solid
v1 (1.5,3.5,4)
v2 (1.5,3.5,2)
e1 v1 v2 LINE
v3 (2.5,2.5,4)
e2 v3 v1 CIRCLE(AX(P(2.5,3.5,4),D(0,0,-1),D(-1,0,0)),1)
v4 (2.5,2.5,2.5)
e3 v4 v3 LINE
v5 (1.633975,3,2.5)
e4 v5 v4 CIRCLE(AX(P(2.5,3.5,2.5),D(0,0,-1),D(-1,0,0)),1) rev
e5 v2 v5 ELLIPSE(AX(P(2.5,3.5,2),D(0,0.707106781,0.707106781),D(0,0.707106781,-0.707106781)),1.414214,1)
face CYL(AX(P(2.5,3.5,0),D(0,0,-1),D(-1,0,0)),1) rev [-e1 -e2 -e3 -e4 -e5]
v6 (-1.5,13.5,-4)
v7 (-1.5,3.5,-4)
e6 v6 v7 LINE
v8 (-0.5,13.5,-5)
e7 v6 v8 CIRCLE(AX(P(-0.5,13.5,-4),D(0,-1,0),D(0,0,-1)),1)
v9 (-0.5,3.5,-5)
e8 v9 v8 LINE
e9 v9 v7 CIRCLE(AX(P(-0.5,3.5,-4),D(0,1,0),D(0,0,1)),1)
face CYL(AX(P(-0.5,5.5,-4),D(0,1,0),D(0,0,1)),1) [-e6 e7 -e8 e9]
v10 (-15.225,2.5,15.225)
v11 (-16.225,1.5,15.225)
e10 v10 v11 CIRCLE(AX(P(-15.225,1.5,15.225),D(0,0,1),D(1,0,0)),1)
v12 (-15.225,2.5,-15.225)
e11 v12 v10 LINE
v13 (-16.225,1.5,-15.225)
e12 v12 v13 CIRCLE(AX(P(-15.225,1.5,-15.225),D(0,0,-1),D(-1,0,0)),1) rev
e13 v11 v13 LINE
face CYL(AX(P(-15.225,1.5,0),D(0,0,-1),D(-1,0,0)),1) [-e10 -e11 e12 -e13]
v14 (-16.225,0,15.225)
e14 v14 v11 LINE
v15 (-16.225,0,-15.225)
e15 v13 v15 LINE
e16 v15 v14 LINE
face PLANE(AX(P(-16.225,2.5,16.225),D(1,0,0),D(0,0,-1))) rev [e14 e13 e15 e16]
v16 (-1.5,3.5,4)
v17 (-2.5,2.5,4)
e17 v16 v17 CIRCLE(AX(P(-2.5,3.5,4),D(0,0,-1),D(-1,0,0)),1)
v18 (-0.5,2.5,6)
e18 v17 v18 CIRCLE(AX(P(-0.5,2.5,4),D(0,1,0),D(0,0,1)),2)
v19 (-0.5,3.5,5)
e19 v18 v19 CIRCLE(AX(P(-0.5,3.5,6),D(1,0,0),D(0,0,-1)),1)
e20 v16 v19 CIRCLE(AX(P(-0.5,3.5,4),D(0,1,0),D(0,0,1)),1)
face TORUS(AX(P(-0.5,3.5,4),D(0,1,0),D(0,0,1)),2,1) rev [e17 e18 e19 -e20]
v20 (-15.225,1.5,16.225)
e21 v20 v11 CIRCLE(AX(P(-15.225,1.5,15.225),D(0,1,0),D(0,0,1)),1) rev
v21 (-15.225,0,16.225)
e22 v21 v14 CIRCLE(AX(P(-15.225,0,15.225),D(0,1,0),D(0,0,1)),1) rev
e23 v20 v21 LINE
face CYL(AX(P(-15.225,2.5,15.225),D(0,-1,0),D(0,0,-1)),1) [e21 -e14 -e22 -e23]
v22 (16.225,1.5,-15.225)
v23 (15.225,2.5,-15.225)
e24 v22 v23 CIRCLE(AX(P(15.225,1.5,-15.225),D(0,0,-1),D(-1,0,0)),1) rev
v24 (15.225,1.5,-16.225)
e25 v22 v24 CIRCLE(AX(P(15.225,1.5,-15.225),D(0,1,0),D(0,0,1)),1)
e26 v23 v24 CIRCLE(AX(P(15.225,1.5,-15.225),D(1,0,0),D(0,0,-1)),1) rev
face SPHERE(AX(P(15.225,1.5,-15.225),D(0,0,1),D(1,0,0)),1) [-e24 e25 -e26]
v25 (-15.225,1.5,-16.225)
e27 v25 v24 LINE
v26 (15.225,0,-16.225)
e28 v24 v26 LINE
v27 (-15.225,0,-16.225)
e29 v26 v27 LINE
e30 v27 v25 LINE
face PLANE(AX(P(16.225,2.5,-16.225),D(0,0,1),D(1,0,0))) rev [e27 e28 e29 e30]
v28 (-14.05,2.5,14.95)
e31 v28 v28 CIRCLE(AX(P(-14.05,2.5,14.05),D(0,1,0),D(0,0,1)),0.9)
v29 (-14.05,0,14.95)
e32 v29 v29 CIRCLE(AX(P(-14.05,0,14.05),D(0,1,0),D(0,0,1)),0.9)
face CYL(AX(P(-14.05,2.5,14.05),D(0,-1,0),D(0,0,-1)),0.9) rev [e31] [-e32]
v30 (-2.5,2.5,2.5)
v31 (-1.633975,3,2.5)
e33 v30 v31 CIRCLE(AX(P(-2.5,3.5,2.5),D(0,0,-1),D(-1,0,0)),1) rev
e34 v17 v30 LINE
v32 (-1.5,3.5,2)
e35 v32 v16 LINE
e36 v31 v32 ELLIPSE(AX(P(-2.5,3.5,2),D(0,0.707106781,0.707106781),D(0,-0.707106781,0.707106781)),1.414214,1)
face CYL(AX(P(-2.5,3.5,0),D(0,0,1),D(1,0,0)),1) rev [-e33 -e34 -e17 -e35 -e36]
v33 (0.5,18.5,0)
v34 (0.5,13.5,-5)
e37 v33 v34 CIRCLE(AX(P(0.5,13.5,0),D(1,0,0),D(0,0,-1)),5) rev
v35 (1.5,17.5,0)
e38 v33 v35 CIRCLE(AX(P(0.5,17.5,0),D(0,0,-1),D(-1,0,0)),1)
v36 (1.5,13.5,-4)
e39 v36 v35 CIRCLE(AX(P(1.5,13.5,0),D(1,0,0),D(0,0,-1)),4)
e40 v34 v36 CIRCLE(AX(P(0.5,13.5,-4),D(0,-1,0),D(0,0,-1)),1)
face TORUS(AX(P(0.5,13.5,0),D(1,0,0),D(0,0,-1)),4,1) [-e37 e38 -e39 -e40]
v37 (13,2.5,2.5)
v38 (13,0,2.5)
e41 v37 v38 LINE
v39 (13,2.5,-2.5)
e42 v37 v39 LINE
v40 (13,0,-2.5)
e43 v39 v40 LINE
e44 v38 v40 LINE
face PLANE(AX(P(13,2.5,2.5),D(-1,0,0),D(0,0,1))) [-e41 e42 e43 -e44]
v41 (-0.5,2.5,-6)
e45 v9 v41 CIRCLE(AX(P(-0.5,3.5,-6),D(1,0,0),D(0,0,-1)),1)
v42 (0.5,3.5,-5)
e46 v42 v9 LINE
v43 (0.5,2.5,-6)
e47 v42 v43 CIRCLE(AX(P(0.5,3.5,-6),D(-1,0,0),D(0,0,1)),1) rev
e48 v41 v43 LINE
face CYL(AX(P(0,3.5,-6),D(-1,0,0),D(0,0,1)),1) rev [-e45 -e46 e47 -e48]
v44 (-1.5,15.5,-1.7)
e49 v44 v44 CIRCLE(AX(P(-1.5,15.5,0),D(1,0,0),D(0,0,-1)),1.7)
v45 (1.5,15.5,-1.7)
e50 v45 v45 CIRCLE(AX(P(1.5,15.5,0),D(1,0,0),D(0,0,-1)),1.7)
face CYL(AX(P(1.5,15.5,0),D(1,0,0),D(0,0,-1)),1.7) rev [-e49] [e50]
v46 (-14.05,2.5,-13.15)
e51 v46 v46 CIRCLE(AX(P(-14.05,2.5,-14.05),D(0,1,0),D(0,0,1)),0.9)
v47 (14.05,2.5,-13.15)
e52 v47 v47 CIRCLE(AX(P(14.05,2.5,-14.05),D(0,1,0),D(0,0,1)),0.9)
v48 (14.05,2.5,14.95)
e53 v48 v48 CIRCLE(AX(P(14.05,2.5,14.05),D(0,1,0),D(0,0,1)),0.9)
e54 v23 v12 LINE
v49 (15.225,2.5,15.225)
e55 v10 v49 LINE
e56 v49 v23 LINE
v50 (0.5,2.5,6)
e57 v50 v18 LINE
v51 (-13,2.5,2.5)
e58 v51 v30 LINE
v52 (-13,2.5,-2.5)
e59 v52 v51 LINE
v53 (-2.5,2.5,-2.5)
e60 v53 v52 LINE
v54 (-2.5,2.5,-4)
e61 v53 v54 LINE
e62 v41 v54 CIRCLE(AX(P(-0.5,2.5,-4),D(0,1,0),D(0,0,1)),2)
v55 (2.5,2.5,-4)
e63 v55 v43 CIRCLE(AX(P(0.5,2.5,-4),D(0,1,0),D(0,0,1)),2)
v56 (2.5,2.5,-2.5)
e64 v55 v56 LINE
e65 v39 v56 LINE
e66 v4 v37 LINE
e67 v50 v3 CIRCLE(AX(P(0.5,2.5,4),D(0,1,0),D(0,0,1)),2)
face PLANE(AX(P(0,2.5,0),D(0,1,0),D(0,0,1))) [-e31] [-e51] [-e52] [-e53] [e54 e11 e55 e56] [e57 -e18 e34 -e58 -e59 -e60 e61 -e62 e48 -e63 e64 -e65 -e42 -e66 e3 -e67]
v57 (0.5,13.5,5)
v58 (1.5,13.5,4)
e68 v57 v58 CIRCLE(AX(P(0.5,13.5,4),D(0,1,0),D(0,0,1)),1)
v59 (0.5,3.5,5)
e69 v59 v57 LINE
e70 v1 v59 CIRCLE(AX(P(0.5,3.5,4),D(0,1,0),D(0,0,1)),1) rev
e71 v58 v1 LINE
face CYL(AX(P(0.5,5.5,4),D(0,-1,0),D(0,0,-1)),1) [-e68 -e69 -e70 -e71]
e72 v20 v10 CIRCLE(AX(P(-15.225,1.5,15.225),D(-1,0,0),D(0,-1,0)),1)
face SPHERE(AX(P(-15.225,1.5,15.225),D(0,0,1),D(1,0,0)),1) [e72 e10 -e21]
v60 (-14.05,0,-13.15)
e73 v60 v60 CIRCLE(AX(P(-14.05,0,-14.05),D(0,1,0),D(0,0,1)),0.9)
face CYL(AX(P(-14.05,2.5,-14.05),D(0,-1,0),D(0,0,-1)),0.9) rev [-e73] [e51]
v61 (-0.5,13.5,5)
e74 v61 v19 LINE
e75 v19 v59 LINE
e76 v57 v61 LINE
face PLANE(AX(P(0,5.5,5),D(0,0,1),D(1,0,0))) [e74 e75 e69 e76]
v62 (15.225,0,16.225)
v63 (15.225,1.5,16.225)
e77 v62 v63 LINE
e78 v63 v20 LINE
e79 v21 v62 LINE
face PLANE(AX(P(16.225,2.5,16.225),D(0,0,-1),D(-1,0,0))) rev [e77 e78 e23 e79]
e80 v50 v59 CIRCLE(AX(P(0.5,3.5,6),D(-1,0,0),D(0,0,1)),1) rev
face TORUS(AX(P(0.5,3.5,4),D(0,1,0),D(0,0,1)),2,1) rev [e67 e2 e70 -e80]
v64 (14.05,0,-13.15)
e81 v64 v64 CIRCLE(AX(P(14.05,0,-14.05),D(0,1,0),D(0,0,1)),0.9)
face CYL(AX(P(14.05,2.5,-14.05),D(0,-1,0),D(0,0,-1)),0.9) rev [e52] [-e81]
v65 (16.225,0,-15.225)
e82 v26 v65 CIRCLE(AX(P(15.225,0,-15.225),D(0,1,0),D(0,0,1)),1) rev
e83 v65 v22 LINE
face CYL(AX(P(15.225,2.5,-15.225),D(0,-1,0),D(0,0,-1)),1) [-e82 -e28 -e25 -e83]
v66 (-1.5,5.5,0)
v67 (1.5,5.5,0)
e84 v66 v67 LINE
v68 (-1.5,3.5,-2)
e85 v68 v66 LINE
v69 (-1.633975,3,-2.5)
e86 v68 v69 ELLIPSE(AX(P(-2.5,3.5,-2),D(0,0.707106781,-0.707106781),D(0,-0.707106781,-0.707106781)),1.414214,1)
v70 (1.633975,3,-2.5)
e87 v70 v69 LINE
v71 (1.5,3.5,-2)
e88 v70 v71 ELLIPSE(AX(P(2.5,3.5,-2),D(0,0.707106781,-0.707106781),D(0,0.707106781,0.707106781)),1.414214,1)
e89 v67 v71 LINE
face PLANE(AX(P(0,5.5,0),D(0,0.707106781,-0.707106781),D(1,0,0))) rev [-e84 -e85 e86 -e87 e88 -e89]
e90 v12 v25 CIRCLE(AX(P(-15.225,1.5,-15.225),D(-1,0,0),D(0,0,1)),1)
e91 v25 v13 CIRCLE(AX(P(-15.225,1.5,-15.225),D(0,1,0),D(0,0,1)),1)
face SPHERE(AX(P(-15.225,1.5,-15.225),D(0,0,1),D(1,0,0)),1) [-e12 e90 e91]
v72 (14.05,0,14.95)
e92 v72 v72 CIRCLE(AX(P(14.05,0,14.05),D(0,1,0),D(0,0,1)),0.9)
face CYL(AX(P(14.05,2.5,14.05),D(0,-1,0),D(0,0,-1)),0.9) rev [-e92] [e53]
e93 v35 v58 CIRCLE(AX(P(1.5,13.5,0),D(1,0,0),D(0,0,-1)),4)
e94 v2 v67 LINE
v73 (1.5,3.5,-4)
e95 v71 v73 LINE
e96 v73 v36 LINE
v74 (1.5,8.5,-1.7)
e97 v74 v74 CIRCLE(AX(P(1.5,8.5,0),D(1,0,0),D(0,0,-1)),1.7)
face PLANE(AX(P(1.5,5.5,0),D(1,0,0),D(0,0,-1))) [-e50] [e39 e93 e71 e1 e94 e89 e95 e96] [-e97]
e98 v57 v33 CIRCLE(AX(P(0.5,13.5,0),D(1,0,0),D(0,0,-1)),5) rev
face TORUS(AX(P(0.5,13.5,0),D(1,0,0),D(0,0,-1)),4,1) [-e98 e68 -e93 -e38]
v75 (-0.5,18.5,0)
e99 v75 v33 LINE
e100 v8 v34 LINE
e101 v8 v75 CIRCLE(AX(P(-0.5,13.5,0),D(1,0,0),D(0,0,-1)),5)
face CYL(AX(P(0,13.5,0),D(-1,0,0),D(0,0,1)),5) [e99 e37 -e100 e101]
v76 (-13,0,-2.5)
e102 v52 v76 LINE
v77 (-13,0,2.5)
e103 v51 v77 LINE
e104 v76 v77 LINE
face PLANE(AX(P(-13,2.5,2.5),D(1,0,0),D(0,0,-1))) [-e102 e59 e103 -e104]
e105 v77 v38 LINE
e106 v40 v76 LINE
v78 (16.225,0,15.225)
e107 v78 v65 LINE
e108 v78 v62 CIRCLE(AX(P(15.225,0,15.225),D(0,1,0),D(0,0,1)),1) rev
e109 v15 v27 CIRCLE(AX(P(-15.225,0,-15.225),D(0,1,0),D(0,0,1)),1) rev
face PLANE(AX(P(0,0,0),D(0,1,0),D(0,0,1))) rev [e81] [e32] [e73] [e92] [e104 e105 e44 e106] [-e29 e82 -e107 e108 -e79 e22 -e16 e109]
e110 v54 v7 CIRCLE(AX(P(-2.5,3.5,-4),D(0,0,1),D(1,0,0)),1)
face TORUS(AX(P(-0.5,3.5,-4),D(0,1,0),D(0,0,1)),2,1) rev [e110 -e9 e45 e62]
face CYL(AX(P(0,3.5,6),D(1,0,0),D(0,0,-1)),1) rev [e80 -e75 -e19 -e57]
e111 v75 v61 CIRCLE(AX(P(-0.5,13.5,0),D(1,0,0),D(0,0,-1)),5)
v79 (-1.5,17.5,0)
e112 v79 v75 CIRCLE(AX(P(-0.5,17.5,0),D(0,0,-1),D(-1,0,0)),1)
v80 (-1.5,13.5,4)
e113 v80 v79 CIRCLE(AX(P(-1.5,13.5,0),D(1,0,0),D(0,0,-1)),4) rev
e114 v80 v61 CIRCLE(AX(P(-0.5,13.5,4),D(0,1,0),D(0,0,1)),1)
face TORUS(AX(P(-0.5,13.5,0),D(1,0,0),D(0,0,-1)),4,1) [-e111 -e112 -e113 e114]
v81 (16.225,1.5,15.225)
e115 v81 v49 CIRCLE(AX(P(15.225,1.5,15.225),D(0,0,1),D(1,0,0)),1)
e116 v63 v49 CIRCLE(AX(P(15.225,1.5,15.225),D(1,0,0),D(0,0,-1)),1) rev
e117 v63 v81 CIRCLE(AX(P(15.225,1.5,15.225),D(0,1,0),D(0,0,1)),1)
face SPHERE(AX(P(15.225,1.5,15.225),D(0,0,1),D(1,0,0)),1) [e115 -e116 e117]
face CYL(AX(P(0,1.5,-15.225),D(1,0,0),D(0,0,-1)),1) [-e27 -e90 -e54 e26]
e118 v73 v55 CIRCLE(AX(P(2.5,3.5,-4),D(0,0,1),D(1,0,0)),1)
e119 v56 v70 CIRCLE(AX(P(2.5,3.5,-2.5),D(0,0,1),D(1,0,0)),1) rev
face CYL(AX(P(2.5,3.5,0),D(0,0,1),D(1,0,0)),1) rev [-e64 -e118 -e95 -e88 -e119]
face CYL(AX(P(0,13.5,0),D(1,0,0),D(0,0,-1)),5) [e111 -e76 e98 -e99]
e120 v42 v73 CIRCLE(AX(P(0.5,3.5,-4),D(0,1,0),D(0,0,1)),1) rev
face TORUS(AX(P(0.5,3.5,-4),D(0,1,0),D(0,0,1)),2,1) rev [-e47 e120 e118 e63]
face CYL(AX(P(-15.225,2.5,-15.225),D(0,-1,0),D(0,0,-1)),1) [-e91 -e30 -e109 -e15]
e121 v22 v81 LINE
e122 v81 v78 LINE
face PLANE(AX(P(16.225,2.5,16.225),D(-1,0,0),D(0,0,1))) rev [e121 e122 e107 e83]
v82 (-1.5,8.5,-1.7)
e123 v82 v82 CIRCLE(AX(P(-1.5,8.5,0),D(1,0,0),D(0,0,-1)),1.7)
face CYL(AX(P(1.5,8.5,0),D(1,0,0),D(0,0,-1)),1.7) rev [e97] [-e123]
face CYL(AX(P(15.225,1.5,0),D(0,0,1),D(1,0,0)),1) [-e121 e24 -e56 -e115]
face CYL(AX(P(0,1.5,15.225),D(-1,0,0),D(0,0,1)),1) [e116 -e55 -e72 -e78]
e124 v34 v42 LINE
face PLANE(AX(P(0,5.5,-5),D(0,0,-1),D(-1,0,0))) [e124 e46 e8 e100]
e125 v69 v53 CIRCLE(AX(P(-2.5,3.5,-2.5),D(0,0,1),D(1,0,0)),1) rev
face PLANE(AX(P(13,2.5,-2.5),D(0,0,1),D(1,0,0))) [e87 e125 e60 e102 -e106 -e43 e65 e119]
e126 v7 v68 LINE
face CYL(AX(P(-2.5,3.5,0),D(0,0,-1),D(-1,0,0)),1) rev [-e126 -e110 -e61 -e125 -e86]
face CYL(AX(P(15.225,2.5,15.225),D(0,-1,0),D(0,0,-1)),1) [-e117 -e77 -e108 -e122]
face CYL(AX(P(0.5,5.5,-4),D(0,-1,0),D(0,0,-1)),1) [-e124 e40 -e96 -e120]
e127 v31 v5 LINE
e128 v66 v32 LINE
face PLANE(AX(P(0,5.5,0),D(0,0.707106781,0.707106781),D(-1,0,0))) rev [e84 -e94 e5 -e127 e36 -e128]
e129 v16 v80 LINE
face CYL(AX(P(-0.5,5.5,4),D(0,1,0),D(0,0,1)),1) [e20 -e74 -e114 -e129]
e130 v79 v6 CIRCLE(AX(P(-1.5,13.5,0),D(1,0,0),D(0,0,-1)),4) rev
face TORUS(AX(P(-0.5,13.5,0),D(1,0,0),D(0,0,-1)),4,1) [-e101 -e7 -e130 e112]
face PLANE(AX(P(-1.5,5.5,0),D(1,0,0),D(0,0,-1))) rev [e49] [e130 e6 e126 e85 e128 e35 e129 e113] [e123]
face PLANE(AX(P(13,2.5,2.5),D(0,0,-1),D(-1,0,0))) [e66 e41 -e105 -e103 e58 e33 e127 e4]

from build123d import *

# Parameters (mm, degrees)
SKETCH1_W            = 32.45
SKETCH1_H            = 32.45
SKETCH1_R            = 0.9
SKETCH1_W_2          = 26
SKETCH1_H_2          = 5
BOSS_EXTRUDE1_DEPTH  = 2.5
SKETCH3_W            = 3
SKETCH3_H            = 2.5
BOSS_EXTRUDE2_DEPTH  = 3
SKETCH4_W            = 3
SKETCH4_H            = 10
BOSS_EXTRUDE3_DEPTH  = 13
CHAMFER1_SIZE        = 2.5
M3_CLEARANCE_HOLE2_D = 3.4
FILLET1_R            = 5
FILLET2_R            = 1


# Some blends are built 0.0001 mm under size
with BuildPart() as part:
    # Sketch1 → Boss-Extrude1 (new body)
    with BuildSketch(Plane(origin=(0, 0, 0), x_dir=(1, 0, 0), z_dir=(0, 1, 0))):
        Rectangle(SKETCH1_W, SKETCH1_H)
        with Locations(Location((-14.05, 14.05, 0), (0, 0, 270))):
            Circle(SKETCH1_R, mode=Mode.SUBTRACT)
        with Locations(Location((14.05, 14.05, 0), (0, 0, 270))):
            Circle(SKETCH1_R, mode=Mode.SUBTRACT)
        with Locations(Location((14.05, -14.05, 0), (0, 0, 270))):
            Circle(SKETCH1_R, mode=Mode.SUBTRACT)
        with Locations(Location((-14.05, -14.05, 0), (0, 0, 270))):
            Circle(SKETCH1_R, mode=Mode.SUBTRACT)
        Rectangle(SKETCH1_W_2, SKETCH1_H_2, mode=Mode.SUBTRACT)
    extrude(amount=BOSS_EXTRUDE1_DEPTH)

    # Sketch3 → Boss-Extrude2 (add)
    with BuildSketch(Plane(origin=(0, 2.5, 0), x_dir=(1, 0, 0), z_dir=(0, 1, 0))):
        with Locations((0, -3.75)):
            Rectangle(SKETCH3_W, SKETCH3_H)
        with Locations((0, 3.75)):
            Rectangle(SKETCH3_W, SKETCH3_H)
    extrude(amount=BOSS_EXTRUDE2_DEPTH)

    # Sketch4 → Boss-Extrude3 (add)
    with BuildSketch(Plane(origin=(0, 5.5, 0), x_dir=(1, 0, 0), z_dir=(0, 1, 0))):
        Rectangle(SKETCH4_W, SKETCH4_H)
    extrude(amount=BOSS_EXTRUDE3_DEPTH)

    # Chamfer1
    chamfer1_edges = [part.edges().sort_by_distance(p)[0] for p in [
        (0, 5.5, 2.5),
        (0, 5.5, -2.5),
    ]]
    chamfer(chamfer1_edges, length=CHAMFER1_SIZE - 0.0001)  # a hair under: the kernel refuses the full size

    # M3 Clearance Hole2 (through all)
    with Locations(Plane(origin=(1.5, 0, 0), x_dir=(0, 0, -1), z_dir=(1, 0, 0))):
        with Locations((0, 15.5), (0, 8.5)):
            Hole(M3_CLEARANCE_HOLE2_D / 2)

    # Fillet1
    fillet1_edges = [part.edges().sort_by_distance(p)[0] for p in [
        (0, 18.5, -5),
        (0, 18.5, 5),
    ]]
    fillet(fillet1_edges, radius=FILLET1_R - 0.0001)  # a hair under: the kernel refuses the full size

    # Fillet2
    # the kernel refuses this fillet: 1 mm, written as the material it takes off along each edge
    with BuildSketch(Plane(origin=(-15.225, 1.5, -15.225), x_dir=(0, 0, -1), z_dir=(-1, 0, 0))) as fillet2_piece_1_section:
        Polygon((0, 0), (FILLET2_R, 0), (FILLET2_R, -FILLET2_R), (0, -FILLET2_R), align=None)
    fillet2_piece_1 = extrude(amount=FILLET2_R, mode=Mode.PRIVATE)
    fillet2_piece_1 = fillet2_piece_1 - Plane(origin=(-15.225, 1.5, -15.225), x_dir=(0, -0.7071067811865475, 0.7071067811865475), z_dir=(-1, 0, 0)) * Sphere(FILLET2_R, mode=Mode.PRIVATE)
    add(fillet2_piece_1, mode=Mode.SUBTRACT)
    with BuildSketch(Plane(origin=(15.225, 1.5, -15.225), x_dir=(0, 0, -1), z_dir=(1, 0, 0))) as fillet2_piece_2_section:
        Polygon((0, 0), (FILLET2_R, 0), (FILLET2_R, FILLET2_R), (0, FILLET2_R), align=None)
    fillet2_piece_2 = extrude(amount=FILLET2_R, mode=Mode.PRIVATE)
    fillet2_piece_2 = fillet2_piece_2 - Plane(origin=(15.225, 1.5, -15.225), x_dir=(0, -0.7071067811865475, 0.7071067811865475), z_dir=(1, 0, 0)) * Sphere(FILLET2_R, mode=Mode.PRIVATE)
    add(fillet2_piece_2, mode=Mode.SUBTRACT)
    with BuildSketch(Plane(origin=(-15.225, 1.5, 15.225), x_dir=(0, 1, 0), z_dir=(-1, 0, 0))) as fillet2_piece_3_section:
        Polygon((0, 0), (FILLET2_R, 0), (FILLET2_R, -FILLET2_R), (0, -FILLET2_R), align=None)
    fillet2_piece_3 = extrude(amount=FILLET2_R, mode=Mode.PRIVATE)
    fillet2_piece_3 = fillet2_piece_3 - Plane(origin=(-15.225, 1.5, 15.225), x_dir=(0, -0.7071067811865475, -0.7071067811865475), z_dir=(-1, 0, 0)) * Sphere(FILLET2_R, mode=Mode.PRIVATE)
    add(fillet2_piece_3, mode=Mode.SUBTRACT)
    with BuildSketch(Plane(origin=(15.225, 1.5, 15.225), x_dir=(0, 1, 0), z_dir=(1, 0, 0))) as fillet2_piece_4_section:
        Polygon((0, 0), (FILLET2_R, 0), (FILLET2_R, FILLET2_R), (0, FILLET2_R), align=None)
    fillet2_piece_4 = extrude(amount=FILLET2_R, mode=Mode.PRIVATE)
    fillet2_piece_4 = fillet2_piece_4 - Plane(origin=(15.225, 1.5, 15.225), x_dir=(0, -0.7071067811865475, -0.7071067811865475), z_dir=(1, 0, 0)) * Sphere(FILLET2_R, mode=Mode.PRIVATE)
    add(fillet2_piece_4, mode=Mode.SUBTRACT)
    with BuildSketch(Plane(origin=(-1.5, 13.5001, -5), x_dir=(0, 0, 1), z_dir=(0, -1, 0))) as fillet2_piece_5:
        with BuildLine():
            CenterArc((FILLET2_R, -FILLET2_R), FILLET2_R, 90, 90)
            Line((0, -FILLET2_R), (0, 0))
            Line((0, 0), (FILLET2_R, 0))
        make_face()
    extrude(amount=11.0001, mode=Mode.SUBTRACT)
    with BuildSketch(Plane(origin=(-1.5, 13.5001, -0.0001), x_dir=(0, 1, 0), z_dir=(0, 0, 1))) as fillet2_piece_6:
        with BuildLine():
            CenterArc((4.9999 - FILLET2_R, -FILLET2_R), FILLET2_R, 0, 90)
            Line((4.9999, -FILLET2_R), (4.9999, 0))
            Line((4.9999, 0), (4.9999 - FILLET2_R, 0))
        make_face()
    revolve(axis=Axis((-1.5, 13.5001, -0.0001), (-1, 0, 0)), revolution_arc=90, mode=Mode.SUBTRACT)
    with BuildSketch(Plane(origin=(-1.5, 13.5001, 0.0001), x_dir=(0, 0, 1), z_dir=(0, -1, 0))) as fillet2_piece_7:
        with BuildLine():
            CenterArc((4.9999 - FILLET2_R, -FILLET2_R), FILLET2_R, 0, 90)
            Line((4.9999, -FILLET2_R), (4.9999, 0))
            Line((4.9999, 0), (4.9999 - FILLET2_R, 0))
        make_face()
    revolve(axis=Axis((-1.5, 13.5001, 0.0001), (-1, 0, 0)), revolution_arc=90, mode=Mode.SUBTRACT)
    with BuildSketch(Plane(origin=(1.5, 2.5, -5), x_dir=(-1, 0, 0), z_dir=(0, 1, 0)), Plane(origin=(-1.5, 13.5001, 5), x_dir=(0, 0, -1), z_dir=(0, -1, 0)), Plane(origin=(1.5, 13.5001, 5), x_dir=(-1, 0, 0), z_dir=(0, -1, 0))) as fillet2_piece_8:
        with BuildLine():
            CenterArc((FILLET2_R, FILLET2_R), FILLET2_R, 180, 90)
            Line((0, FILLET2_R), (0, 0))
            Line((0, 0), (FILLET2_R, 0))
        make_face()
    extrude(amount=11.0001, mode=Mode.SUBTRACT)
    with BuildSketch(Plane(origin=(1.5, 13.5001, -0.0001), x_dir=(0, 1, 0), z_dir=(0, 0, 1))) as fillet2_piece_9:
        with BuildLine():
            CenterArc((4.9999 - FILLET2_R, FILLET2_R), FILLET2_R, 270, 90)
            Line((4.9999 - FILLET2_R, 0), (4.9999, 0))
            Line((4.9999, 0), (4.9999, FILLET2_R))
        make_face()
    revolve(axis=Axis((1.5, 13.5001, -0.0001), (-1, 0, 0)), revolution_arc=90, mode=Mode.SUBTRACT)
    with BuildSketch(Plane(origin=(1.5, 13.5001, 0.0001), x_dir=(0, 0, 1), z_dir=(0, -1, 0))) as fillet2_piece_10:
        with BuildLine():
            CenterArc((4.9999 - FILLET2_R, FILLET2_R), FILLET2_R, 270, 90)
            Line((4.9999 - FILLET2_R, 0), (4.9999, 0))
            Line((4.9999, 0), (4.9999, FILLET2_R))
        make_face()
    revolve(axis=Axis((1.5, 13.5001, 0.0001), (-1, 0, 0)), revolution_arc=90, mode=Mode.SUBTRACT)
    with BuildSketch(Plane(origin=(-15.225, 2.5, -16.225), x_dir=(0, 0, 1), z_dir=(1, 0, 0)), Plane(origin=(-16.225, 2.5, 15.225), x_dir=(1, 0, 0), z_dir=(0, 0, -1)), Plane(origin=(15.225, 2.5, 16.225), x_dir=(0, 0, -1), z_dir=(-1, 0, 0)), Plane(origin=(16.225, 2.5, -15.225), x_dir=(-1, 0, 0), z_dir=(0, 0, 1))) as fillet2_piece_11:
        with BuildLine():
            CenterArc((FILLET2_R, FILLET2_R), FILLET2_R, 180, 90)
            Line((0, FILLET2_R), (0, 0))
            Line((0, 0), (FILLET2_R, 0))
        make_face()
    extrude(amount=30.45, mode=Mode.SUBTRACT)
    with BuildSketch(Plane(origin=(-16.225, -2.5, 16.225), x_dir=(1, 0, 0), z_dir=(0, 1, 0)), Plane(origin=(-16.225, -2.5, -16.225), x_dir=(0, 0, 1), z_dir=(0, 1, 0))) as fillet2_piece_12:
        with BuildLine():
            CenterArc((FILLET2_R, FILLET2_R), FILLET2_R, 180, 90)
            Line((0, FILLET2_R), (0, 0))
            Line((0, 0), (FILLET2_R, 0))
        make_face()
    extrude(amount=4, mode=Mode.SUBTRACT)
    with BuildSketch(Plane(origin=(16.225, -2.5, -16.225), x_dir=(0, 0, 1), z_dir=(0, 1, 0)), Plane(origin=(16.225, -2.5, 16.225), x_dir=(-1, 0, 0), z_dir=(0, 1, 0))) as fillet2_piece_13:
        with BuildLine():
            CenterArc((FILLET2_R, -FILLET2_R), FILLET2_R, 90, 90)
            Line((0, -FILLET2_R), (0, 0))
            Line((0, 0), (FILLET2_R, 0))
        make_face()
    extrude(amount=4, mode=Mode.SUBTRACT)
    with BuildSketch(Plane(origin=(1.5, 18.5, -0.0001), x_dir=(-1, 0, 0), z_dir=(0, 0, 1))) as fillet2_piece_14:
        with BuildLine():
            CenterArc((FILLET2_R, FILLET2_R), FILLET2_R, 180, 90)
            Line((0, FILLET2_R), (0, 0))
            Line((0, 0), (FILLET2_R, 0))
        make_face()
    extrude(amount=0.0002, mode=Mode.SUBTRACT)
    with BuildSketch(Plane(origin=(-1.5, 18.5, 0.0001), x_dir=(0, -1, 0), z_dir=(0, 0, -1))) as fillet2_piece_15:
        with BuildLine():
            CenterArc((FILLET2_R, -FILLET2_R), FILLET2_R, 90, 90)
            Line((0, -FILLET2_R), (0, 0))
            Line((0, 0), (FILLET2_R, 0))
        make_face()
    extrude(amount=0.0002, mode=Mode.SUBTRACT)
    # the kernel refuses this fillet: 1 mm, written as the material it adds along each edge
    with BuildSketch(Plane(origin=(-1.5, 2.5, -4), x_dir=(0, 1, 0), z_dir=(0, 0, 1))) as fillet2_2_piece_1_section:
        with BuildLine():
            CenterArc((FILLET2_R, FILLET2_R), FILLET2_R, 180, 90)
            Line((0, FILLET2_R), (0, 0))
            Line((0, 0), (FILLET2_R, 0))
        make_face()
    fillet2_2_piece_1 = extrude(amount=1.5, mode=Mode.PRIVATE)
    fillet2_2_piece_1 = split(fillet2_2_piece_1, bisect_by=Plane(origin=(-1.7072894, 2.435643561, -3.064456439), z_dir=(0, 0.7071067811865476, -0.7071067811865476)), keep=Keep.TOP, mode=Mode.PRIVATE)
    add(fillet2_2_piece_1)
    with BuildSketch(Plane(origin=(-1.5, 2.5, -4), x_dir=(0, 1, 0), z_dir=(0, 0, 1))) as fillet2_2_piece_2_section:
        with BuildLine():
            CenterArc((FILLET2_R, FILLET2_R), FILLET2_R, 180, 90)
            Line((0, FILLET2_R), (0, 0))
            Line((0, 0), (FILLET2_R, 0))
        make_face()
    fillet2_2_piece_2 = extrude(amount=1.5, mode=Mode.PRIVATE)
    fillet2_2_piece_2 = split(fillet2_2_piece_2, bisect_by=Plane(origin=(-1.804773182, 2.70404687, -2.79605313), z_dir=(0, -0.7071067811865476, 0.7071067811865476)), keep=Keep.TOP, mode=Mode.PRIVATE)
    add(fillet2_2_piece_2)
    with BuildSketch(Plane(origin=(-1.5, 2.5, -4), x_dir=(0, 1, 0), z_dir=(0, 0, 1))) as fillet2_2_piece_3_section:
        with BuildLine():
            CenterArc((FILLET2_R, FILLET2_R), FILLET2_R, 180, 90)
            Line((0, FILLET2_R), (0, 0))
            Line((0, 0), (FILLET2_R, 0))
        make_face()
    fillet2_2_piece_3 = extrude(amount=4, mode=Mode.PRIVATE)
    fillet2_2_piece_3 = split(fillet2_2_piece_3, bisect_by=Plane(origin=(-1.50867739, 3.263680502, -2.5), z_dir=(0, 0, 1)), keep=Keep.TOP, mode=Mode.PRIVATE)
    fillet2_2_piece_3 = split(fillet2_2_piece_3, bisect_by=Plane(origin=(-1.50867739, 3.197785377, -2.302314623), z_dir=(0, 0.7071067811865476, -0.7071067811865476)), keep=Keep.TOP, mode=Mode.PRIVATE)
    add(fillet2_2_piece_3)
    with BuildSketch(Plane(origin=(1.5, 2.5, 0), x_dir=(1, 0, 0), z_dir=(0, 0, -1))) as fillet2_2_piece_4_section:
        with BuildLine():
            CenterArc((FILLET2_R, -FILLET2_R), FILLET2_R, 90, 90)
            Line((0, -FILLET2_R), (0, 0))
            Line((0, 0), (FILLET2_R, 0))
        make_face()
    fillet2_2_piece_4 = extrude(amount=4, mode=Mode.PRIVATE)
    fillet2_2_piece_4 = split(fillet2_2_piece_4, bisect_by=Plane(origin=(1.508677391, 3.2636805, -2.5), z_dir=(0, 0, 1)), keep=Keep.TOP, mode=Mode.PRIVATE)
    fillet2_2_piece_4 = split(fillet2_2_piece_4, bisect_by=Plane(origin=(1.508677391, 3.197785375, -2.302314625), z_dir=(0, 0.7071067811865476, -0.7071067811865476)), keep=Keep.TOP, mode=Mode.PRIVATE)
    add(fillet2_2_piece_4)
    with BuildSketch(Plane(origin=(1.5, 2.5, -2.5), x_dir=(1, 0, 0), z_dir=(0, 0, -1))) as fillet2_2_piece_5_section:
        with BuildLine():
            CenterArc((FILLET2_R, -FILLET2_R), FILLET2_R, 90, 90)
            Line((0, -FILLET2_R), (0, 0))
            Line((0, 0), (FILLET2_R, 0))
        make_face()
    fillet2_2_piece_5 = extrude(amount=1.5, mode=Mode.PRIVATE)
    fillet2_2_piece_5 = split(fillet2_2_piece_5, bisect_by=Plane(origin=(1.804773183, 2.704046871, -2.796053129), z_dir=(0, -0.7071067811865476, 0.7071067811865476)), keep=Keep.TOP, mode=Mode.PRIVATE)
    add(fillet2_2_piece_5)
    with BuildSketch(Plane(origin=(1.5, 2.5, -2.5), x_dir=(1, 0, 0), z_dir=(0, 0, -1))) as fillet2_2_piece_6_section:
        with BuildLine():
            CenterArc((FILLET2_R, -FILLET2_R), FILLET2_R, 90, 90)
            Line((0, -FILLET2_R), (0, 0))
            Line((0, 0), (FILLET2_R, 0))
        make_face()
    fillet2_2_piece_6 = extrude(amount=1.5, mode=Mode.PRIVATE)
    fillet2_2_piece_6 = split(fillet2_2_piece_6, bisect_by=Plane(origin=(1.707289398, 2.435643555, -3.064456445), z_dir=(0, 0.7071067811865476, -0.7071067811865476)), keep=Keep.TOP, mode=Mode.PRIVATE)
    add(fillet2_2_piece_6)
    with BuildSketch(Plane(origin=(0.5, 2.5, -5), x_dir=(0, 0, -1), z_dir=(-1, 0, 0)), Plane(origin=(-0.5, 2.5, 5), x_dir=(0, 0, 1), z_dir=(1, 0, 0))) as fillet2_2_piece_7:
        with BuildLine():
            CenterArc((FILLET2_R, -FILLET2_R), FILLET2_R, 90, 90)
            Line((0, -FILLET2_R), (0, 0))
            Line((0, 0), (FILLET2_R, 0))
        make_face()
    extrude(amount=1)
    with BuildSketch(Plane(origin=(-1.5, 2.5, 2.5), x_dir=(0, 1, 0), z_dir=(0, 0, 1))) as fillet2_2_piece_8_section:
        with BuildLine():
            CenterArc((FILLET2_R, FILLET2_R), FILLET2_R, 180, 90)
            Line((0, FILLET2_R), (0, 0))
            Line((0, 0), (FILLET2_R, 0))
        make_face()
    fillet2_2_piece_8 = extrude(amount=1.5, mode=Mode.PRIVATE)
    fillet2_2_piece_8 = split(fillet2_2_piece_8, bisect_by=Plane(origin=(-1.804773182, 2.70404687, 2.79605313), z_dir=(0, -0.7071067811865476, -0.7071067811865476)), keep=Keep.TOP, mode=Mode.PRIVATE)
    add(fillet2_2_piece_8)
    with BuildSketch(Plane(origin=(-1.5, 2.5, 0), x_dir=(0, 1, 0), z_dir=(0, 0, 1))) as fillet2_2_piece_9_section:
        with BuildLine():
            CenterArc((FILLET2_R, FILLET2_R), FILLET2_R, 180, 90)
            Line((0, FILLET2_R), (0, 0))
            Line((0, 0), (FILLET2_R, 0))
        make_face()
    fillet2_2_piece_9 = extrude(amount=4, mode=Mode.PRIVATE)
    fillet2_2_piece_9 = split(fillet2_2_piece_9, bisect_by=Plane(origin=(-1.50867739, 3.197785377, 2.302314623), z_dir=(0, 0.7071067811865476, 0.7071067811865476)), keep=Keep.TOP, mode=Mode.PRIVATE)
    fillet2_2_piece_9 = split(fillet2_2_piece_9, bisect_by=Plane(origin=(-1.50867739, 3.263680502, 2.5), z_dir=(0, 0, -1)), keep=Keep.TOP, mode=Mode.PRIVATE)
    add(fillet2_2_piece_9)
    with BuildSketch(Plane(origin=(-1.5, 2.5, 2.5), x_dir=(0, 1, 0), z_dir=(0, 0, 1))) as fillet2_2_piece_10_section:
        with BuildLine():
            CenterArc((FILLET2_R, FILLET2_R), FILLET2_R, 180, 90)
            Line((0, FILLET2_R), (0, 0))
            Line((0, 0), (FILLET2_R, 0))
        make_face()
    fillet2_2_piece_10 = extrude(amount=1.5, mode=Mode.PRIVATE)
    fillet2_2_piece_10 = split(fillet2_2_piece_10, bisect_by=Plane(origin=(-1.7072894, 2.435643561, 3.064456439), z_dir=(0, 0.7071067811865476, 0.7071067811865476)), keep=Keep.TOP, mode=Mode.PRIVATE)
    add(fillet2_2_piece_10)
    with BuildSketch(Plane(origin=(1.5, 2.5, 4), x_dir=(1, 0, 0), z_dir=(0, 0, -1))) as fillet2_2_piece_11_section:
        with BuildLine():
            CenterArc((FILLET2_R, -FILLET2_R), FILLET2_R, 90, 90)
            Line((0, -FILLET2_R), (0, 0))
            Line((0, 0), (FILLET2_R, 0))
        make_face()
    fillet2_2_piece_11 = extrude(amount=1.5, mode=Mode.PRIVATE)
    fillet2_2_piece_11 = split(fillet2_2_piece_11, bisect_by=Plane(origin=(1.707289398, 2.435643555, 3.064456445), z_dir=(0, 0.7071067811865476, 0.7071067811865476)), keep=Keep.TOP, mode=Mode.PRIVATE)
    add(fillet2_2_piece_11)
    with BuildSketch(Plane(origin=(1.5, 2.5, 4), x_dir=(1, 0, 0), z_dir=(0, 0, -1))) as fillet2_2_piece_12_section:
        with BuildLine():
            CenterArc((FILLET2_R, -FILLET2_R), FILLET2_R, 90, 90)
            Line((0, -FILLET2_R), (0, 0))
            Line((0, 0), (FILLET2_R, 0))
        make_face()
    fillet2_2_piece_12 = extrude(amount=4, mode=Mode.PRIVATE)
    fillet2_2_piece_12 = split(fillet2_2_piece_12, bisect_by=Plane(origin=(1.508677391, 3.2636805, 2.5), z_dir=(0, 0, -1)), keep=Keep.TOP, mode=Mode.PRIVATE)
    fillet2_2_piece_12 = split(fillet2_2_piece_12, bisect_by=Plane(origin=(1.508677391, 3.197785375, 2.302314625), z_dir=(0, 0.7071067811865476, 0.7071067811865476)), keep=Keep.TOP, mode=Mode.PRIVATE)
    add(fillet2_2_piece_12)
    with BuildSketch(Plane(origin=(1.5, 2.5, 4), x_dir=(1, 0, 0), z_dir=(0, 0, -1))) as fillet2_2_piece_13_section:
        with BuildLine():
            CenterArc((FILLET2_R, -FILLET2_R), FILLET2_R, 90, 90)
            Line((0, -FILLET2_R), (0, 0))
            Line((0, 0), (FILLET2_R, 0))
        make_face()
    fillet2_2_piece_13 = extrude(amount=1.5, mode=Mode.PRIVATE)
    fillet2_2_piece_13 = split(fillet2_2_piece_13, bisect_by=Plane(origin=(1.804773183, 2.704046871, 2.796053129), z_dir=(0, -0.7071067811865476, -0.7071067811865476)), keep=Keep.TOP, mode=Mode.PRIVATE)
    add(fillet2_2_piece_13)
    with BuildSketch(Plane(origin=(0.5, 2.5, 4), x_dir=(0, 0, 1), z_dir=(-1, 0, 0))) as fillet2_2_piece_14:
        with BuildLine():
            CenterArc((1 + FILLET2_R, FILLET2_R), FILLET2_R, 180, 90)
            Line((1, FILLET2_R), (1, 0))
            Line((1, 0), (1 + FILLET2_R, 0))
        make_face()
    revolve(axis=Axis((0.5, 2.5, 4), (0, 1, 0)), revolution_arc=90)
    with BuildSketch(Plane(origin=(-0.5, 2.5, 4), x_dir=(-1, 0, 0), z_dir=(0, 0, -1))) as fillet2_2_piece_15:
        with BuildLine():
            CenterArc((1 + FILLET2_R, FILLET2_R), FILLET2_R, 180, 90)
            Line((1, FILLET2_R), (1, 0))
            Line((1, 0), (1 + FILLET2_R, 0))
        make_face()
    revolve(axis=Axis((-0.5, 2.5, 4), (0, 1, 0)), revolution_arc=90)
    with BuildSketch(Plane(origin=(0.5, 2.5, -4), x_dir=(0, 0, -1), z_dir=(-1, 0, 0))) as fillet2_2_piece_16:
        with BuildLine():
            CenterArc((1 + FILLET2_R, -FILLET2_R), FILLET2_R, 90, 90)
            Line((1, -FILLET2_R), (1, 0))
            Line((1, 0), (1 + FILLET2_R, 0))
        make_face()
    revolve(axis=Axis((0.5, 2.5, -4), (0, -1, 0)), revolution_arc=90)
    with BuildSketch(Plane(origin=(-0.5, 2.5, -4), x_dir=(-1, 0, 0), z_dir=(0, 0, 1))) as fillet2_2_piece_17:
        with BuildLine():
            CenterArc((1 + FILLET2_R, -FILLET2_R), FILLET2_R, 90, 90)
            Line((1 + FILLET2_R, 0), (1, 0))
            Line((1, 0), (1, -FILLET2_R))
        make_face()
    revolve(axis=Axis((-0.5, 2.5, -4), (0, -1, 0)), revolution_arc=90)


solid = part.part
